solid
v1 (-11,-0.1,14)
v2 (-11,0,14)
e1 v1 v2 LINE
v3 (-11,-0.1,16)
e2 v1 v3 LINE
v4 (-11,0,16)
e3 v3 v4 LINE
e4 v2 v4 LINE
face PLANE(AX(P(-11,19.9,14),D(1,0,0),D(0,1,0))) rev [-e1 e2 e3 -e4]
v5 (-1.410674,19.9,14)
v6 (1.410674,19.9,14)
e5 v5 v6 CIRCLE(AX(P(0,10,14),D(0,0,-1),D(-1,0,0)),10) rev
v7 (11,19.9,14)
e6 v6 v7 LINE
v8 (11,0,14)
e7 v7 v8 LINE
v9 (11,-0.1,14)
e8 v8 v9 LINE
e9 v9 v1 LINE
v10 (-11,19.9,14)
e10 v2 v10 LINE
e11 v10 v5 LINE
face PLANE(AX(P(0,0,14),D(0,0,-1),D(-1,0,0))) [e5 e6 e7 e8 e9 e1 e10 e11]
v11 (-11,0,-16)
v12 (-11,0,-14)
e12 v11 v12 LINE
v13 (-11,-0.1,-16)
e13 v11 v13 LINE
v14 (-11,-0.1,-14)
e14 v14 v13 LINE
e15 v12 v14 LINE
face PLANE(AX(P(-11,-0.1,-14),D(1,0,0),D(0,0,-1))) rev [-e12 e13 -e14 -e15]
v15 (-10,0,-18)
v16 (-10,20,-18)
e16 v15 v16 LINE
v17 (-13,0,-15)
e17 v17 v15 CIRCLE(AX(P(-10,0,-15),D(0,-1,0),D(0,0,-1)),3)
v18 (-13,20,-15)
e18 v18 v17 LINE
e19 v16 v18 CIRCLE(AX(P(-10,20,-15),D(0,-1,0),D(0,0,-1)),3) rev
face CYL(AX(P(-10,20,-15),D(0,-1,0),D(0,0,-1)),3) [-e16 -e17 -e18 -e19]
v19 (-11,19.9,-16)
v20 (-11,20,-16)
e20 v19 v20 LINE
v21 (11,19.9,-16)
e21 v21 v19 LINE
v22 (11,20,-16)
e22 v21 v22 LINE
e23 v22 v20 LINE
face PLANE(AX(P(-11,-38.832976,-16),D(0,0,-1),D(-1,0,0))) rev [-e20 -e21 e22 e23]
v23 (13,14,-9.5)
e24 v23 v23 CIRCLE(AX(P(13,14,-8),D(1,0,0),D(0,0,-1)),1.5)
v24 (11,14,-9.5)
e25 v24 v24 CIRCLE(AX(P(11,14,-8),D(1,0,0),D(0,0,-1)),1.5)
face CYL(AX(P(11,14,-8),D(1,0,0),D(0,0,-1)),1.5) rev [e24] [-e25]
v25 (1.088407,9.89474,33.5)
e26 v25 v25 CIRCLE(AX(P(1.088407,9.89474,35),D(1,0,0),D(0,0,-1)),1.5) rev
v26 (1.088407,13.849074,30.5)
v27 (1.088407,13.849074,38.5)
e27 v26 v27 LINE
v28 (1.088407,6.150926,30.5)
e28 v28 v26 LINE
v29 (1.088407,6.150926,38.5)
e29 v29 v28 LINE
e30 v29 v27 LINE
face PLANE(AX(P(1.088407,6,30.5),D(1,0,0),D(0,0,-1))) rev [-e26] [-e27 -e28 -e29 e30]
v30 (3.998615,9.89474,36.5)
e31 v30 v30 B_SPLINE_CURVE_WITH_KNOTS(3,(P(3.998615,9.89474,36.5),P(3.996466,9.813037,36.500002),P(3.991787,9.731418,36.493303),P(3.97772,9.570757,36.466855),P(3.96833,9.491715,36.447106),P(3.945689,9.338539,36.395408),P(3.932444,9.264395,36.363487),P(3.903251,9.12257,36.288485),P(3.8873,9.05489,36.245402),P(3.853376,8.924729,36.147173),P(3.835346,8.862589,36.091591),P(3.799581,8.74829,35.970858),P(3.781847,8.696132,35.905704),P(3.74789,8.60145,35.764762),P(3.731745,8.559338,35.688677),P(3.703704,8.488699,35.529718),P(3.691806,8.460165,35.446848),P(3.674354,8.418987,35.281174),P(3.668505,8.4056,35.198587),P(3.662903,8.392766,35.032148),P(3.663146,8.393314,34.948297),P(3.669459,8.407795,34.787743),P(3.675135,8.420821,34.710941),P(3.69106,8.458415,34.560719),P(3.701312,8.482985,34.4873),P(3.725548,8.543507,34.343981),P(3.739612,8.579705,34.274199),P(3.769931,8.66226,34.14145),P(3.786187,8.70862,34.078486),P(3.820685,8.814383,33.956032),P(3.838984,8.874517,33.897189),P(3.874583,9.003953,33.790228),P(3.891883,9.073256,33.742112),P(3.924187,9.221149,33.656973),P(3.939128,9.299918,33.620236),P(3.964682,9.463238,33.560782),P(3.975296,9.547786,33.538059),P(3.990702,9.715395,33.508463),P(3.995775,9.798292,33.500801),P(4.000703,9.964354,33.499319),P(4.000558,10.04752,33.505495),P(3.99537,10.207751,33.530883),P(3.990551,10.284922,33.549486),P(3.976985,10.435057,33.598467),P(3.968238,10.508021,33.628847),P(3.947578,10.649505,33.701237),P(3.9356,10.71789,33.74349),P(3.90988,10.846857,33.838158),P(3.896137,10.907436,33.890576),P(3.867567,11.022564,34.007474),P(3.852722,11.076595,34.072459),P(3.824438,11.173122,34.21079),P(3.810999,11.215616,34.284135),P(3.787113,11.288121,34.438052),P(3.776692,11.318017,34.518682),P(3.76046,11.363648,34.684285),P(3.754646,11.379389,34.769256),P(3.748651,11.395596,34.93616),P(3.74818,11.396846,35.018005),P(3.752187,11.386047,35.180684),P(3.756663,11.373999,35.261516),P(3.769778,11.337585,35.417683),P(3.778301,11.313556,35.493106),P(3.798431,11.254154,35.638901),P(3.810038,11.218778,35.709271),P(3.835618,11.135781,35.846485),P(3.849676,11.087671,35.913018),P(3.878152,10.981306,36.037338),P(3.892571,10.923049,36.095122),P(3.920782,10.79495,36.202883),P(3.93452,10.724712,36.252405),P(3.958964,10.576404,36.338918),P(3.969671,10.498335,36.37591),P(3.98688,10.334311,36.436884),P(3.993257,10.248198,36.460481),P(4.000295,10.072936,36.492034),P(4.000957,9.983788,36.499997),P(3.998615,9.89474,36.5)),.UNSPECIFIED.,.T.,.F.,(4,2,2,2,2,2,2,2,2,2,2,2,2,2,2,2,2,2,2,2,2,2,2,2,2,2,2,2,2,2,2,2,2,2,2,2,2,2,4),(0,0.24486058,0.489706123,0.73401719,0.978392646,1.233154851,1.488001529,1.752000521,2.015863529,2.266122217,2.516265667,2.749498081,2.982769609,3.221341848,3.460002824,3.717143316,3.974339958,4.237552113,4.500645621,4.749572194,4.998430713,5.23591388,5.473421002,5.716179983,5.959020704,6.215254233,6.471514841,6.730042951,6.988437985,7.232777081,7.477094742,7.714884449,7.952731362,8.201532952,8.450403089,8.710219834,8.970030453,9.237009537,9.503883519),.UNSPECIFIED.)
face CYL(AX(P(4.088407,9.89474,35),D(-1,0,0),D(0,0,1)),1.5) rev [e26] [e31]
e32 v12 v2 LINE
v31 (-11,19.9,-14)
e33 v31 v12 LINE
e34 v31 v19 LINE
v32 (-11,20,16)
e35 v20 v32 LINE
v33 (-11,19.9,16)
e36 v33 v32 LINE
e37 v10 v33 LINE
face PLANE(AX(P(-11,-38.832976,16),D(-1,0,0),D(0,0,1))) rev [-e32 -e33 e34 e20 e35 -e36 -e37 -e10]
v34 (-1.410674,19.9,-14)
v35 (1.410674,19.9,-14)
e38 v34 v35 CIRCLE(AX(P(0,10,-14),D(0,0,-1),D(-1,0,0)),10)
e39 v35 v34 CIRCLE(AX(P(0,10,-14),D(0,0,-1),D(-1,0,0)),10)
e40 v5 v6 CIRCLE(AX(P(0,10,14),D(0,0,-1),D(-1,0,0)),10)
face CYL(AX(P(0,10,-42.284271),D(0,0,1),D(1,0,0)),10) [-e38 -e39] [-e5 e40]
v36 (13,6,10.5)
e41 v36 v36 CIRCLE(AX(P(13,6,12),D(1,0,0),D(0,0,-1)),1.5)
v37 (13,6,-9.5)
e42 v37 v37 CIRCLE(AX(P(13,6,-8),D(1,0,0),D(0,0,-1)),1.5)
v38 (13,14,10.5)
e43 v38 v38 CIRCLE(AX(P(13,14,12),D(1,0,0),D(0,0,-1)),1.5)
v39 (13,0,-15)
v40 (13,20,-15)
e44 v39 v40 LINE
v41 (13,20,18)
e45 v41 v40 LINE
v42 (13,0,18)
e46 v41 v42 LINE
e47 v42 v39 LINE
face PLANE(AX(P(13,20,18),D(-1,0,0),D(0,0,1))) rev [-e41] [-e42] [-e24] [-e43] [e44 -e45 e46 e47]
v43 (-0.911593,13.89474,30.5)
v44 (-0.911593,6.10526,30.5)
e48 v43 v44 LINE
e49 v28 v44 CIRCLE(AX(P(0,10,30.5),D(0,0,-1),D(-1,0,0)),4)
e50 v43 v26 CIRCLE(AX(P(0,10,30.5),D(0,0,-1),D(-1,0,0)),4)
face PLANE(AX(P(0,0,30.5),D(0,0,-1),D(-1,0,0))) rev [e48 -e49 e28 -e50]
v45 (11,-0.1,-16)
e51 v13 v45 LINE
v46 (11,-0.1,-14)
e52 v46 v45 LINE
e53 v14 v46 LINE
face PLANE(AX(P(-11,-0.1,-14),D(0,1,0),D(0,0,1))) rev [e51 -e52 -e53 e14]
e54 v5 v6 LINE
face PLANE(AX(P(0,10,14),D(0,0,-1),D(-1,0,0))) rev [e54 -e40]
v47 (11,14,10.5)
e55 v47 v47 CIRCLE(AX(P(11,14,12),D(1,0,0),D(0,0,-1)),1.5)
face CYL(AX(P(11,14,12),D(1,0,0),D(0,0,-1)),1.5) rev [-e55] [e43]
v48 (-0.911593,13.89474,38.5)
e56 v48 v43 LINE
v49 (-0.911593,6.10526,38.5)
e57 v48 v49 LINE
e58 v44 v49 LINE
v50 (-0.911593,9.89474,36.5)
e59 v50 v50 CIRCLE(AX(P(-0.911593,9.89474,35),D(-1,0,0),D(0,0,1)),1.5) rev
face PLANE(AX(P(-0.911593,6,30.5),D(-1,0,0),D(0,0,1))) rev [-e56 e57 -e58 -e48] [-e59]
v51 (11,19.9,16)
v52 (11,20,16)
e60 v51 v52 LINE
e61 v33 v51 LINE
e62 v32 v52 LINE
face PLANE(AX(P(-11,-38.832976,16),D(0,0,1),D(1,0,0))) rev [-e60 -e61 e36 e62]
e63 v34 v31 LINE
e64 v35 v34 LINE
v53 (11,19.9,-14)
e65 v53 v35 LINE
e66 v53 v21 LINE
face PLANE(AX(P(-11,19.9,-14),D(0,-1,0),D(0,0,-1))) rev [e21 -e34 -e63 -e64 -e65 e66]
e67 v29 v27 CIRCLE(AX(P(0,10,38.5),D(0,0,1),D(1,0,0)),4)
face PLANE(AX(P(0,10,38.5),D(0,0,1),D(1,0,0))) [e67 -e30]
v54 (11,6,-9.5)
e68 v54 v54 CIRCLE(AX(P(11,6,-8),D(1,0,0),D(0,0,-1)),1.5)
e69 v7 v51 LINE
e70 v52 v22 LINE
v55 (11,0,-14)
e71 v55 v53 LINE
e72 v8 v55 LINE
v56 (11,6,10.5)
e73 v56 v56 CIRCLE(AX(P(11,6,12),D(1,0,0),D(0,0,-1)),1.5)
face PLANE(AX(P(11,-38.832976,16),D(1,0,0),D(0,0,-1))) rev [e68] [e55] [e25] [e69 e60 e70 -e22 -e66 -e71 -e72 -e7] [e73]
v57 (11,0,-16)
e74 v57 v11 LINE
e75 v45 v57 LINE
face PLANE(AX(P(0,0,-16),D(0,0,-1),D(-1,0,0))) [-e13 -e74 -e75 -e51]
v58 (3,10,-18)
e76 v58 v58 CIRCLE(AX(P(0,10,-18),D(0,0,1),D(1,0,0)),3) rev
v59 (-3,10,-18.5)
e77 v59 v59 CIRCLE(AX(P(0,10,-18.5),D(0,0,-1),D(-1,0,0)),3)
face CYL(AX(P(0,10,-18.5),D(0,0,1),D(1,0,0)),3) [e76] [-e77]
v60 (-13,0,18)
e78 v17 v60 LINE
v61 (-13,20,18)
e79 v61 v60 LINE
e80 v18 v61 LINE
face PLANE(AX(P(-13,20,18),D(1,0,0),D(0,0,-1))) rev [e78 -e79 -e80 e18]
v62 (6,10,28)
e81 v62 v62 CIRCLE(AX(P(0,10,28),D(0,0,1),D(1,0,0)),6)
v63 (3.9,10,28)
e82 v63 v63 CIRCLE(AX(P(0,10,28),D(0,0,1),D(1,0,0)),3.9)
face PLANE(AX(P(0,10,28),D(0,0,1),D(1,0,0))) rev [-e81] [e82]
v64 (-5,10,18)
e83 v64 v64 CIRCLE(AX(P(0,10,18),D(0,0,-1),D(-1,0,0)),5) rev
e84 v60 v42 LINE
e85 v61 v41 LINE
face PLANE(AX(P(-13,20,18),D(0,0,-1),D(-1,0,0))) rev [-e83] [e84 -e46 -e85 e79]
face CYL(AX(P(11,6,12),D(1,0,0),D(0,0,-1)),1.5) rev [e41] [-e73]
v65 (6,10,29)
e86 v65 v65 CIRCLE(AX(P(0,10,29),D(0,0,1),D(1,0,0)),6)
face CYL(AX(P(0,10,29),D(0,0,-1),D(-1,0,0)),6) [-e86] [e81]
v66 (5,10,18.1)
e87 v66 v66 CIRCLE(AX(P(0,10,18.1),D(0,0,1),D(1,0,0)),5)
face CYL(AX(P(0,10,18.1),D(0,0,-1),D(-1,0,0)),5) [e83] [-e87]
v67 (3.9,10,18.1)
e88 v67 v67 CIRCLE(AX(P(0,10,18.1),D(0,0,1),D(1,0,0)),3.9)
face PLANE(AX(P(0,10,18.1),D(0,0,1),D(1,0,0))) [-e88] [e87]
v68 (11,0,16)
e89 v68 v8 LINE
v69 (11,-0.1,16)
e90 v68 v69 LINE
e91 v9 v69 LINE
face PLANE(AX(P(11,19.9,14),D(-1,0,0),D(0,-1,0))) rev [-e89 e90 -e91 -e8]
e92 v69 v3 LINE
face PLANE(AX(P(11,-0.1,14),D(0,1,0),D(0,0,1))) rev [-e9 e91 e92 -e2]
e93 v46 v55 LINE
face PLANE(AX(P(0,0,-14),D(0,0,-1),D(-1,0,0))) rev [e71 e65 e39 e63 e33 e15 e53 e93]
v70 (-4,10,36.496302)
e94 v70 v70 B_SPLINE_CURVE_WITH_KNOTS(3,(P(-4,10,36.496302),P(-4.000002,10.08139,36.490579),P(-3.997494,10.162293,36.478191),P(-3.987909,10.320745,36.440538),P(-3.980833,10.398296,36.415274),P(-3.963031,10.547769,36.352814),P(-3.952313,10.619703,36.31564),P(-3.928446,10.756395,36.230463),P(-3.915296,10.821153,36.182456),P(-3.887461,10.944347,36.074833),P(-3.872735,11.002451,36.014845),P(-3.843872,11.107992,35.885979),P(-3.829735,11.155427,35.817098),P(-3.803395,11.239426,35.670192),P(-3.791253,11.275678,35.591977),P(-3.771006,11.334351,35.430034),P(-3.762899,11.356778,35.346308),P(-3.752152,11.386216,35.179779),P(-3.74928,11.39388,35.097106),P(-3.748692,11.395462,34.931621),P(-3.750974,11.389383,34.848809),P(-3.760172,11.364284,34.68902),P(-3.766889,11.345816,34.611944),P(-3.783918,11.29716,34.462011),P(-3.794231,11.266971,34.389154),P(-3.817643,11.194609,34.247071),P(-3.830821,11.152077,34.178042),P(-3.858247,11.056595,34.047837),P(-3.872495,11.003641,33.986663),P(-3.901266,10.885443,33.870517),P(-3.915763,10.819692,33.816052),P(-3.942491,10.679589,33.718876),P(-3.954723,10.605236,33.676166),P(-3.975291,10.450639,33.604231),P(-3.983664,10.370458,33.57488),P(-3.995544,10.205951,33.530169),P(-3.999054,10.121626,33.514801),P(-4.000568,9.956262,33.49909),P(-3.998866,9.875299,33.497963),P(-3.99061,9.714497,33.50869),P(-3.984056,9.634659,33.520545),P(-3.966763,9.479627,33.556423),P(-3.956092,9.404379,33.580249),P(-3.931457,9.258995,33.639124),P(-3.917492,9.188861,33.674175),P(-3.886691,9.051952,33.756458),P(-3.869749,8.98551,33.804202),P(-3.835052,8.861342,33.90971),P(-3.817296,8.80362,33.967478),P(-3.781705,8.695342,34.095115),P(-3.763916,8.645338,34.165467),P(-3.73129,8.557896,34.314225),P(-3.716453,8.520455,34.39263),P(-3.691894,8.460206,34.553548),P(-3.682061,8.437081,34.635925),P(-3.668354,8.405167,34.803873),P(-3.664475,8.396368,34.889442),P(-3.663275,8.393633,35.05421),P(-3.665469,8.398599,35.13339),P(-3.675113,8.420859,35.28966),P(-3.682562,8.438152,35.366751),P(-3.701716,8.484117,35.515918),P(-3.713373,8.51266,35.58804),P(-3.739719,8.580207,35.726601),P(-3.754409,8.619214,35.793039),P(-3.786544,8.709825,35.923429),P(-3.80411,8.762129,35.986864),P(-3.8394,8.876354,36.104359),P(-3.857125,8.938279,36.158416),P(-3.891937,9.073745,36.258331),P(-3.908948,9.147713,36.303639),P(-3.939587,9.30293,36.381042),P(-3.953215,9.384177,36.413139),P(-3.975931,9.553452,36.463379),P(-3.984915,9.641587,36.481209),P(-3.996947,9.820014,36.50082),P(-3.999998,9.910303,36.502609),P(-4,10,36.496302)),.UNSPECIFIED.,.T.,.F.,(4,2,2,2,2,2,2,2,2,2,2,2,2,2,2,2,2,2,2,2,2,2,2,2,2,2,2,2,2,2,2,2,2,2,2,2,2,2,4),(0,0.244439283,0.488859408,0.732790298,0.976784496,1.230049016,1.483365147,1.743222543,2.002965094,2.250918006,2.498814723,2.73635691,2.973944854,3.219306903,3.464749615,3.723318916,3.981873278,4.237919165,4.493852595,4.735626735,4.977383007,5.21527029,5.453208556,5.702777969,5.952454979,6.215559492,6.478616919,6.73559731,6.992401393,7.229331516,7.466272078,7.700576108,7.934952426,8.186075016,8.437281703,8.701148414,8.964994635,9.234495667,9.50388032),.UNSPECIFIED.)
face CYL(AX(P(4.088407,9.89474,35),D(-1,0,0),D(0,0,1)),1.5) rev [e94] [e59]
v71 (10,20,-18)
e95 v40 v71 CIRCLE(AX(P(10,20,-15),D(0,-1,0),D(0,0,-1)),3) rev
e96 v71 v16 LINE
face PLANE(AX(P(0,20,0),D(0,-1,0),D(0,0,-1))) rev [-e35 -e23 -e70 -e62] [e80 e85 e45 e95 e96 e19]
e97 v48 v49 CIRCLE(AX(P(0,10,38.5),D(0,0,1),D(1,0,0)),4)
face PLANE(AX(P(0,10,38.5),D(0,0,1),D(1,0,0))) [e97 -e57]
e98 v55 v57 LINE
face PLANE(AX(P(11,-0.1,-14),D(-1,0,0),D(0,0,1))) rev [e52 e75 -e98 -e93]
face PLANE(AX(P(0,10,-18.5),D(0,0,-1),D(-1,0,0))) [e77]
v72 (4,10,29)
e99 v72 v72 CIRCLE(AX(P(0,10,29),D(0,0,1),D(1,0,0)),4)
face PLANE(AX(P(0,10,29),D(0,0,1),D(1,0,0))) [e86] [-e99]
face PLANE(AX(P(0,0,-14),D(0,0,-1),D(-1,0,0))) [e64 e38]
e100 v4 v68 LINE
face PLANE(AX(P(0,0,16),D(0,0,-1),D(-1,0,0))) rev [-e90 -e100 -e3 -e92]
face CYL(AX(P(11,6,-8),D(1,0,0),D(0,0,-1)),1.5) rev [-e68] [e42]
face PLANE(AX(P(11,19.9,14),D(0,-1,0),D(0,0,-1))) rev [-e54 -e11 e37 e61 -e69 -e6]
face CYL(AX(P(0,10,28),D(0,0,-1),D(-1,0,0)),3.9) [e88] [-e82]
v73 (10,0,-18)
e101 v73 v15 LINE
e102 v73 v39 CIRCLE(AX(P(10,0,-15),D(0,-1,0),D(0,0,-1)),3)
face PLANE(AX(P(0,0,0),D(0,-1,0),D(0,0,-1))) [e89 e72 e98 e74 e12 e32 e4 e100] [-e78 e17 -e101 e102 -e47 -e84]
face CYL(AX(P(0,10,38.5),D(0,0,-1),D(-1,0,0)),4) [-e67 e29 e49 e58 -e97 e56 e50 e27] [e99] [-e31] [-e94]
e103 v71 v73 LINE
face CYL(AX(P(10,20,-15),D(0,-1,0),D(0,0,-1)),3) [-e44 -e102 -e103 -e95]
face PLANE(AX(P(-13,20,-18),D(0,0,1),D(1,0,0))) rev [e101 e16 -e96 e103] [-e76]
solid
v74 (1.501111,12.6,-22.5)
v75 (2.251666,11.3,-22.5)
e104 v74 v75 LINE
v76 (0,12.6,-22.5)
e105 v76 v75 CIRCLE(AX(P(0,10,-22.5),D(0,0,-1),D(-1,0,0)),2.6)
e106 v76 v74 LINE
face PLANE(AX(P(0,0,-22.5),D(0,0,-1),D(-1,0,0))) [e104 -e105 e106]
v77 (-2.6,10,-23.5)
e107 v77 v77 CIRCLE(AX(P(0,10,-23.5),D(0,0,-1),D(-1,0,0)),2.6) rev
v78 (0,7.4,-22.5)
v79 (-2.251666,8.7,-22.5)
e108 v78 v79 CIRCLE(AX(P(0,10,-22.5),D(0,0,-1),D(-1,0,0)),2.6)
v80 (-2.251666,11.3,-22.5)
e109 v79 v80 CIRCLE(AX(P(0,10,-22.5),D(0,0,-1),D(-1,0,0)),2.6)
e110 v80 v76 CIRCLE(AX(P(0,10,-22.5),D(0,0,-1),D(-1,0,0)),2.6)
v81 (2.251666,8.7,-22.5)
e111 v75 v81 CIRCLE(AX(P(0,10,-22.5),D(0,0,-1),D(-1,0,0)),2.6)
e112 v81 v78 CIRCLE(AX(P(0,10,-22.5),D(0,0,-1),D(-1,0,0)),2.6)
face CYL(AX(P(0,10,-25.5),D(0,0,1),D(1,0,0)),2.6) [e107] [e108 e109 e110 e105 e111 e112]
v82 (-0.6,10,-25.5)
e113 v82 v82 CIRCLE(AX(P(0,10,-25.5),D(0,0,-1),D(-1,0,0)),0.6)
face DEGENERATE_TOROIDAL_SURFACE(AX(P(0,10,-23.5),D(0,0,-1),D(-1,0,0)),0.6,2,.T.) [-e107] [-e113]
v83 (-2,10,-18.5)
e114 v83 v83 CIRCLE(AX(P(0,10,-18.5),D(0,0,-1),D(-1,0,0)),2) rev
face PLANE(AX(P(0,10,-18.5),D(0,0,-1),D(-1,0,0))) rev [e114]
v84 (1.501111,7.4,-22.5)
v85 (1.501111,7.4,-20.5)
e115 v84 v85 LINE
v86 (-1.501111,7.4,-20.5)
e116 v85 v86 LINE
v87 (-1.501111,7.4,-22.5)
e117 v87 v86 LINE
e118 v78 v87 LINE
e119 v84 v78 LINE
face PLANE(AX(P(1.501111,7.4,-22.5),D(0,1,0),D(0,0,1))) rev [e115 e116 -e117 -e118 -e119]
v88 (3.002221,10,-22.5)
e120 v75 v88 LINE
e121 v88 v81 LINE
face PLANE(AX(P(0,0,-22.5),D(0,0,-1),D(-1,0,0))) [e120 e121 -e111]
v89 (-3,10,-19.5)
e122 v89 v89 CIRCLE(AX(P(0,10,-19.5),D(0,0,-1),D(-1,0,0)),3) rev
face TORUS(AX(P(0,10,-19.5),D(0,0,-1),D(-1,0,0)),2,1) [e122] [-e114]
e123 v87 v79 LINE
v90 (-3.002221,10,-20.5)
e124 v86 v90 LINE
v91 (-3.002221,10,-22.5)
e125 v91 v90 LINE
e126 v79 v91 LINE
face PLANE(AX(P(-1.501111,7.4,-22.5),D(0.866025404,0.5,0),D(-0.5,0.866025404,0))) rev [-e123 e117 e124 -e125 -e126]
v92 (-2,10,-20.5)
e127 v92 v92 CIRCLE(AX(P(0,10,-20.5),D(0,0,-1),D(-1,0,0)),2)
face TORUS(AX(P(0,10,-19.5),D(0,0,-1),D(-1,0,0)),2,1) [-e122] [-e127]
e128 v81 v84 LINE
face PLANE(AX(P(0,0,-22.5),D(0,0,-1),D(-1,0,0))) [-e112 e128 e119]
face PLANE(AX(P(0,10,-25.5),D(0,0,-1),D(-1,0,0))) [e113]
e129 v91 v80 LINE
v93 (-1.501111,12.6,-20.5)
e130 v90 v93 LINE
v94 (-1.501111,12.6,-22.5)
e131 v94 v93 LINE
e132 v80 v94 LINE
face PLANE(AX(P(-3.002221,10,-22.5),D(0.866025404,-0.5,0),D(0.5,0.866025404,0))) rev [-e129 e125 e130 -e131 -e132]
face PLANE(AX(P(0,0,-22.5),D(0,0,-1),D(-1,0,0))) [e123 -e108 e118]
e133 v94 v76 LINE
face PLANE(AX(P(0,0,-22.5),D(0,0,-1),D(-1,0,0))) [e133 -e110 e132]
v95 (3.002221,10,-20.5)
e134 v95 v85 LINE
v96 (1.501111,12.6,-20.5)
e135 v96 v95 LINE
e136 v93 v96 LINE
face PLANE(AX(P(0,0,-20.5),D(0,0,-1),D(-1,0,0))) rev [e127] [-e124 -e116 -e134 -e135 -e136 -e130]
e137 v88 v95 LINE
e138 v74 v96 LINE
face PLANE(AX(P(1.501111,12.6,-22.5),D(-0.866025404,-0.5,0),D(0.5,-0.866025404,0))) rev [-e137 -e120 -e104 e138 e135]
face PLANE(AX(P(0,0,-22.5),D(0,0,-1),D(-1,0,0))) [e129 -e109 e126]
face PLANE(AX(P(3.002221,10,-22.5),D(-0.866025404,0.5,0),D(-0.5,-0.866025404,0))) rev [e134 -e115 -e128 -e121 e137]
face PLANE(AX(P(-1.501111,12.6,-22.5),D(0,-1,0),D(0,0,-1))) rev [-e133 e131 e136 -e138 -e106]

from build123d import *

# Parameters (mm, degrees)
SKETCH1_W               = 26
SKETCH1_H               = 36
BOSS_EXTRUDE1_DEPTH     = 20
FILLET1_R               = 3
SKETCH2_W               = 22
SKETCH2_H               = 32
CUT_EXTRUDE1_DEPTH      = 20
SKETCH5_W               = 22
SKETCH5_H               = 20
BOSS_EXTRUDE3_DEPTH     = 2
SKETCH6_W               = 22
SKETCH6_H               = 20
BOSS_EXTRUDE4_DEPTH     = 2
SKETCH7_R               = 10
BOSS_EXTRUDE5_DEPTH     = 28
SKETCH8_R               = 3
BOSS_EXTRUDE6_DEPTH     = 0.5
SKETCH9_R               = 3
BOSS_EXTRUDE7_DEPTH     = 2
FILLET2_R               = 1
BOSS_EXTRUDE8_DEPTH     = 2
SKETCH11_R              = 2.6
BOSS_EXTRUDE9_DEPTH     = 3
FILLET4_R               = 2
SKETCH12_R              = 3.9
BOSS_EXTRUDE10_DEPTH    = 10
SKETCH13_R              = 6
BOSS_EXTRUDE11_DEPTH    = 1
SKETCH14_R              = 4
BOSS_EXTRUDE12_DEPTH    = 9.5
SKETCH15_W              = 2
SKETCH15_H              = 8
CUT_EXTRUDE3_DEPTH      = 8
CUT_EXTRUDE4_DEPTH      = 5
CUT_EXTRUDE4_DEPTH_BACK = 5
SKETCH16_R              = 1.5
SKETCH17_R              = 5
BOSS_EXTRUDE13_DEPTH    = 0.1
SKETCH18_R              = 1.5
CUT_EXTRUDE5_DEPTH      = 2


with BuildPart() as part:
    # Sketch1 → Boss-Extrude1 (new body)
    with BuildSketch(Plane(origin=(0, 0, 0), x_dir=(1, 0, 0), z_dir=(0, 1, 0))):
        Rectangle(SKETCH1_W, SKETCH1_H)
    extrude(amount=BOSS_EXTRUDE1_DEPTH)

    # Fillet1
    fillet1_edges = [part.edges().sort_by_distance(p)[0] for p in [
        (-13, 10, -18),
        (13, 10, -18),
    ]]
    fillet(fillet1_edges, radius=FILLET1_R)

    # Sketch2 → Cut-Extrude1 (cut)
    with BuildSketch(Plane(origin=(0, 20, 0), x_dir=(1, 0, 0), z_dir=(0, 1, 0))):
        Rectangle(SKETCH2_W, SKETCH2_H)
    extrude(amount=-CUT_EXTRUDE1_DEPTH, mode=Mode.SUBTRACT)

    # Sketch5 → Boss-Extrude3 (add)
    with BuildSketch(Plane.XY.offset(-16)):
        with Locations((0, 9.9)):
            Rectangle(SKETCH5_W, SKETCH5_H)
    extrude(amount=BOSS_EXTRUDE3_DEPTH)

    # Sketch6 → Boss-Extrude4 (add)
    with BuildSketch(Plane(origin=(0, 0, 16), x_dir=(-1, 0, 0), z_dir=(0, 0, -1))):
        with Locations((0, 9.9)):
            Rectangle(SKETCH6_W, SKETCH6_H)
    extrude(amount=BOSS_EXTRUDE4_DEPTH)

    # Sketch7 → Boss-Extrude5 (add)
    with BuildSketch(Plane(origin=(0, 0, 14), x_dir=(-1, 0, 0), z_dir=(0, 0, -1))):
        with Locations(Location((0, 10, 0), (0, 0, 98.109614456))):
            Circle(SKETCH7_R)
    extrude(amount=BOSS_EXTRUDE5_DEPTH)

    # Sketch8 → Boss-Extrude6 (add)
    with BuildSketch(Plane(origin=(0, 0, -18), x_dir=(-1, 0, 0), z_dir=(0, 0, -1))):
        with Locations(Location((0, 10, 0), (0, 0, 180))):
            Circle(SKETCH8_R)
    extrude(amount=BOSS_EXTRUDE6_DEPTH)

    # Sketch12 → Boss-Extrude10 (add)
    with BuildSketch(Plane.XY.offset(18)):
        with Locations((0, 10)):
            Circle(SKETCH12_R)
    extrude(amount=BOSS_EXTRUDE10_DEPTH)

    # Sketch13 → Boss-Extrude11 (add)
    with BuildSketch(Plane.XY.offset(28)):
        with Locations((0, 10)):
            Circle(SKETCH13_R)
    extrude(amount=BOSS_EXTRUDE11_DEPTH)

    # Sketch14 → Boss-Extrude12 (add)
    with BuildSketch(Plane.XY.offset(29)):
        with Locations((0, 10)):
            Circle(SKETCH14_R)
    extrude(amount=BOSS_EXTRUDE12_DEPTH)

    # Sketch15 → Cut-Extrude3 (cut)
    with BuildSketch(Plane.XY.offset(38.5)):
        with Locations((0.08840706, 10)):
            Rectangle(SKETCH15_W, SKETCH15_H)
    extrude(amount=-CUT_EXTRUDE3_DEPTH, mode=Mode.SUBTRACT)

    # Sketch16 → Cut-Extrude4 (cut, two sides: drawn at the far end of the back side and taken through both)
    with BuildSketch(Plane(origin=(-0.91159294, 0, 0), x_dir=(0, 0, -1), z_dir=(1, 0, 0)).offset(-CUT_EXTRUDE4_DEPTH_BACK)):
        with Locations(Location((-35, 9.894739826, 0), (0, 0, 180))):
            Circle(SKETCH16_R)
    extrude(amount=CUT_EXTRUDE4_DEPTH + CUT_EXTRUDE4_DEPTH_BACK, mode=Mode.SUBTRACT)

    # Sketch17 → Boss-Extrude13 (add)
    with BuildSketch(Plane.XY.offset(18)):
        with Locations(Location((0, 10, 0), (0, 0, 180))):
            Circle(SKETCH17_R)
    extrude(amount=BOSS_EXTRUDE13_DEPTH)

    # Sketch18 → Cut-Extrude5 (cut)
    with BuildSketch(Plane(origin=(13, 0, 0), x_dir=(0, 0, -1), z_dir=(1, 0, 0))):
        with Locations((-12, 14)):
            Circle(SKETCH18_R)
        with Locations((8, 14)):
            Circle(SKETCH18_R)
        with Locations((8, 6)):
            Circle(SKETCH18_R)
        with Locations((-12, 6)):
            Circle(SKETCH18_R)
    extrude(amount=-CUT_EXTRUDE5_DEPTH, mode=Mode.SUBTRACT)


with BuildPart() as body_2:
    # Sketch9 → Boss-Extrude7 (new body)
    with BuildSketch(Plane(origin=(0, 0, -18.5), x_dir=(-1, 0, 0), z_dir=(0, 0, -1))):
        with Locations((0, 10)):
            Circle(SKETCH9_R)
    extrude(amount=BOSS_EXTRUDE7_DEPTH)

    # Fillet2
    fillet2_edges = [body_2.edges().sort_by_distance(p)[0] for p in [
        (3, 10, -18.5),
        (3, 10, -20.5),
    ]]
    fillet(fillet2_edges, radius=FILLET2_R - 0.0001)  # a hair under: the kernel refuses the full size

    # Sketch10 → Boss-Extrude8 (add)
    with BuildSketch(Plane(origin=(0, 0, -20.5), x_dir=(-1, 0, 0), z_dir=(0, 0, -1))):
        Polygon((3.0022214, 10), (1.5011107, 12.6), (-1.5011107, 12.6), (-3.0022214, 10), (-1.5011107, 7.4), (1.5011107, 7.4), align=None)
    extrude(amount=BOSS_EXTRUDE8_DEPTH)

    # Sketch11 → Boss-Extrude9 (add)
    with BuildSketch(Plane(origin=(0, 0, -22.5), x_dir=(-1, 0, 0), z_dir=(0, 0, -1))):
        with Locations(Location((0, 10, 0), (0, 0, 150))):
            Circle(SKETCH11_R)
    extrude(amount=BOSS_EXTRUDE9_DEPTH)

    # Fillet4
    fillet4_edges = [body_2.edges().sort_by_distance(p)[0] for p in [
        (-2.25166605, 8.7, -25.5),
    ]]
    fillet(fillet4_edges, radius=FILLET4_R)


solid = Compound([part.part, body_2.part])
